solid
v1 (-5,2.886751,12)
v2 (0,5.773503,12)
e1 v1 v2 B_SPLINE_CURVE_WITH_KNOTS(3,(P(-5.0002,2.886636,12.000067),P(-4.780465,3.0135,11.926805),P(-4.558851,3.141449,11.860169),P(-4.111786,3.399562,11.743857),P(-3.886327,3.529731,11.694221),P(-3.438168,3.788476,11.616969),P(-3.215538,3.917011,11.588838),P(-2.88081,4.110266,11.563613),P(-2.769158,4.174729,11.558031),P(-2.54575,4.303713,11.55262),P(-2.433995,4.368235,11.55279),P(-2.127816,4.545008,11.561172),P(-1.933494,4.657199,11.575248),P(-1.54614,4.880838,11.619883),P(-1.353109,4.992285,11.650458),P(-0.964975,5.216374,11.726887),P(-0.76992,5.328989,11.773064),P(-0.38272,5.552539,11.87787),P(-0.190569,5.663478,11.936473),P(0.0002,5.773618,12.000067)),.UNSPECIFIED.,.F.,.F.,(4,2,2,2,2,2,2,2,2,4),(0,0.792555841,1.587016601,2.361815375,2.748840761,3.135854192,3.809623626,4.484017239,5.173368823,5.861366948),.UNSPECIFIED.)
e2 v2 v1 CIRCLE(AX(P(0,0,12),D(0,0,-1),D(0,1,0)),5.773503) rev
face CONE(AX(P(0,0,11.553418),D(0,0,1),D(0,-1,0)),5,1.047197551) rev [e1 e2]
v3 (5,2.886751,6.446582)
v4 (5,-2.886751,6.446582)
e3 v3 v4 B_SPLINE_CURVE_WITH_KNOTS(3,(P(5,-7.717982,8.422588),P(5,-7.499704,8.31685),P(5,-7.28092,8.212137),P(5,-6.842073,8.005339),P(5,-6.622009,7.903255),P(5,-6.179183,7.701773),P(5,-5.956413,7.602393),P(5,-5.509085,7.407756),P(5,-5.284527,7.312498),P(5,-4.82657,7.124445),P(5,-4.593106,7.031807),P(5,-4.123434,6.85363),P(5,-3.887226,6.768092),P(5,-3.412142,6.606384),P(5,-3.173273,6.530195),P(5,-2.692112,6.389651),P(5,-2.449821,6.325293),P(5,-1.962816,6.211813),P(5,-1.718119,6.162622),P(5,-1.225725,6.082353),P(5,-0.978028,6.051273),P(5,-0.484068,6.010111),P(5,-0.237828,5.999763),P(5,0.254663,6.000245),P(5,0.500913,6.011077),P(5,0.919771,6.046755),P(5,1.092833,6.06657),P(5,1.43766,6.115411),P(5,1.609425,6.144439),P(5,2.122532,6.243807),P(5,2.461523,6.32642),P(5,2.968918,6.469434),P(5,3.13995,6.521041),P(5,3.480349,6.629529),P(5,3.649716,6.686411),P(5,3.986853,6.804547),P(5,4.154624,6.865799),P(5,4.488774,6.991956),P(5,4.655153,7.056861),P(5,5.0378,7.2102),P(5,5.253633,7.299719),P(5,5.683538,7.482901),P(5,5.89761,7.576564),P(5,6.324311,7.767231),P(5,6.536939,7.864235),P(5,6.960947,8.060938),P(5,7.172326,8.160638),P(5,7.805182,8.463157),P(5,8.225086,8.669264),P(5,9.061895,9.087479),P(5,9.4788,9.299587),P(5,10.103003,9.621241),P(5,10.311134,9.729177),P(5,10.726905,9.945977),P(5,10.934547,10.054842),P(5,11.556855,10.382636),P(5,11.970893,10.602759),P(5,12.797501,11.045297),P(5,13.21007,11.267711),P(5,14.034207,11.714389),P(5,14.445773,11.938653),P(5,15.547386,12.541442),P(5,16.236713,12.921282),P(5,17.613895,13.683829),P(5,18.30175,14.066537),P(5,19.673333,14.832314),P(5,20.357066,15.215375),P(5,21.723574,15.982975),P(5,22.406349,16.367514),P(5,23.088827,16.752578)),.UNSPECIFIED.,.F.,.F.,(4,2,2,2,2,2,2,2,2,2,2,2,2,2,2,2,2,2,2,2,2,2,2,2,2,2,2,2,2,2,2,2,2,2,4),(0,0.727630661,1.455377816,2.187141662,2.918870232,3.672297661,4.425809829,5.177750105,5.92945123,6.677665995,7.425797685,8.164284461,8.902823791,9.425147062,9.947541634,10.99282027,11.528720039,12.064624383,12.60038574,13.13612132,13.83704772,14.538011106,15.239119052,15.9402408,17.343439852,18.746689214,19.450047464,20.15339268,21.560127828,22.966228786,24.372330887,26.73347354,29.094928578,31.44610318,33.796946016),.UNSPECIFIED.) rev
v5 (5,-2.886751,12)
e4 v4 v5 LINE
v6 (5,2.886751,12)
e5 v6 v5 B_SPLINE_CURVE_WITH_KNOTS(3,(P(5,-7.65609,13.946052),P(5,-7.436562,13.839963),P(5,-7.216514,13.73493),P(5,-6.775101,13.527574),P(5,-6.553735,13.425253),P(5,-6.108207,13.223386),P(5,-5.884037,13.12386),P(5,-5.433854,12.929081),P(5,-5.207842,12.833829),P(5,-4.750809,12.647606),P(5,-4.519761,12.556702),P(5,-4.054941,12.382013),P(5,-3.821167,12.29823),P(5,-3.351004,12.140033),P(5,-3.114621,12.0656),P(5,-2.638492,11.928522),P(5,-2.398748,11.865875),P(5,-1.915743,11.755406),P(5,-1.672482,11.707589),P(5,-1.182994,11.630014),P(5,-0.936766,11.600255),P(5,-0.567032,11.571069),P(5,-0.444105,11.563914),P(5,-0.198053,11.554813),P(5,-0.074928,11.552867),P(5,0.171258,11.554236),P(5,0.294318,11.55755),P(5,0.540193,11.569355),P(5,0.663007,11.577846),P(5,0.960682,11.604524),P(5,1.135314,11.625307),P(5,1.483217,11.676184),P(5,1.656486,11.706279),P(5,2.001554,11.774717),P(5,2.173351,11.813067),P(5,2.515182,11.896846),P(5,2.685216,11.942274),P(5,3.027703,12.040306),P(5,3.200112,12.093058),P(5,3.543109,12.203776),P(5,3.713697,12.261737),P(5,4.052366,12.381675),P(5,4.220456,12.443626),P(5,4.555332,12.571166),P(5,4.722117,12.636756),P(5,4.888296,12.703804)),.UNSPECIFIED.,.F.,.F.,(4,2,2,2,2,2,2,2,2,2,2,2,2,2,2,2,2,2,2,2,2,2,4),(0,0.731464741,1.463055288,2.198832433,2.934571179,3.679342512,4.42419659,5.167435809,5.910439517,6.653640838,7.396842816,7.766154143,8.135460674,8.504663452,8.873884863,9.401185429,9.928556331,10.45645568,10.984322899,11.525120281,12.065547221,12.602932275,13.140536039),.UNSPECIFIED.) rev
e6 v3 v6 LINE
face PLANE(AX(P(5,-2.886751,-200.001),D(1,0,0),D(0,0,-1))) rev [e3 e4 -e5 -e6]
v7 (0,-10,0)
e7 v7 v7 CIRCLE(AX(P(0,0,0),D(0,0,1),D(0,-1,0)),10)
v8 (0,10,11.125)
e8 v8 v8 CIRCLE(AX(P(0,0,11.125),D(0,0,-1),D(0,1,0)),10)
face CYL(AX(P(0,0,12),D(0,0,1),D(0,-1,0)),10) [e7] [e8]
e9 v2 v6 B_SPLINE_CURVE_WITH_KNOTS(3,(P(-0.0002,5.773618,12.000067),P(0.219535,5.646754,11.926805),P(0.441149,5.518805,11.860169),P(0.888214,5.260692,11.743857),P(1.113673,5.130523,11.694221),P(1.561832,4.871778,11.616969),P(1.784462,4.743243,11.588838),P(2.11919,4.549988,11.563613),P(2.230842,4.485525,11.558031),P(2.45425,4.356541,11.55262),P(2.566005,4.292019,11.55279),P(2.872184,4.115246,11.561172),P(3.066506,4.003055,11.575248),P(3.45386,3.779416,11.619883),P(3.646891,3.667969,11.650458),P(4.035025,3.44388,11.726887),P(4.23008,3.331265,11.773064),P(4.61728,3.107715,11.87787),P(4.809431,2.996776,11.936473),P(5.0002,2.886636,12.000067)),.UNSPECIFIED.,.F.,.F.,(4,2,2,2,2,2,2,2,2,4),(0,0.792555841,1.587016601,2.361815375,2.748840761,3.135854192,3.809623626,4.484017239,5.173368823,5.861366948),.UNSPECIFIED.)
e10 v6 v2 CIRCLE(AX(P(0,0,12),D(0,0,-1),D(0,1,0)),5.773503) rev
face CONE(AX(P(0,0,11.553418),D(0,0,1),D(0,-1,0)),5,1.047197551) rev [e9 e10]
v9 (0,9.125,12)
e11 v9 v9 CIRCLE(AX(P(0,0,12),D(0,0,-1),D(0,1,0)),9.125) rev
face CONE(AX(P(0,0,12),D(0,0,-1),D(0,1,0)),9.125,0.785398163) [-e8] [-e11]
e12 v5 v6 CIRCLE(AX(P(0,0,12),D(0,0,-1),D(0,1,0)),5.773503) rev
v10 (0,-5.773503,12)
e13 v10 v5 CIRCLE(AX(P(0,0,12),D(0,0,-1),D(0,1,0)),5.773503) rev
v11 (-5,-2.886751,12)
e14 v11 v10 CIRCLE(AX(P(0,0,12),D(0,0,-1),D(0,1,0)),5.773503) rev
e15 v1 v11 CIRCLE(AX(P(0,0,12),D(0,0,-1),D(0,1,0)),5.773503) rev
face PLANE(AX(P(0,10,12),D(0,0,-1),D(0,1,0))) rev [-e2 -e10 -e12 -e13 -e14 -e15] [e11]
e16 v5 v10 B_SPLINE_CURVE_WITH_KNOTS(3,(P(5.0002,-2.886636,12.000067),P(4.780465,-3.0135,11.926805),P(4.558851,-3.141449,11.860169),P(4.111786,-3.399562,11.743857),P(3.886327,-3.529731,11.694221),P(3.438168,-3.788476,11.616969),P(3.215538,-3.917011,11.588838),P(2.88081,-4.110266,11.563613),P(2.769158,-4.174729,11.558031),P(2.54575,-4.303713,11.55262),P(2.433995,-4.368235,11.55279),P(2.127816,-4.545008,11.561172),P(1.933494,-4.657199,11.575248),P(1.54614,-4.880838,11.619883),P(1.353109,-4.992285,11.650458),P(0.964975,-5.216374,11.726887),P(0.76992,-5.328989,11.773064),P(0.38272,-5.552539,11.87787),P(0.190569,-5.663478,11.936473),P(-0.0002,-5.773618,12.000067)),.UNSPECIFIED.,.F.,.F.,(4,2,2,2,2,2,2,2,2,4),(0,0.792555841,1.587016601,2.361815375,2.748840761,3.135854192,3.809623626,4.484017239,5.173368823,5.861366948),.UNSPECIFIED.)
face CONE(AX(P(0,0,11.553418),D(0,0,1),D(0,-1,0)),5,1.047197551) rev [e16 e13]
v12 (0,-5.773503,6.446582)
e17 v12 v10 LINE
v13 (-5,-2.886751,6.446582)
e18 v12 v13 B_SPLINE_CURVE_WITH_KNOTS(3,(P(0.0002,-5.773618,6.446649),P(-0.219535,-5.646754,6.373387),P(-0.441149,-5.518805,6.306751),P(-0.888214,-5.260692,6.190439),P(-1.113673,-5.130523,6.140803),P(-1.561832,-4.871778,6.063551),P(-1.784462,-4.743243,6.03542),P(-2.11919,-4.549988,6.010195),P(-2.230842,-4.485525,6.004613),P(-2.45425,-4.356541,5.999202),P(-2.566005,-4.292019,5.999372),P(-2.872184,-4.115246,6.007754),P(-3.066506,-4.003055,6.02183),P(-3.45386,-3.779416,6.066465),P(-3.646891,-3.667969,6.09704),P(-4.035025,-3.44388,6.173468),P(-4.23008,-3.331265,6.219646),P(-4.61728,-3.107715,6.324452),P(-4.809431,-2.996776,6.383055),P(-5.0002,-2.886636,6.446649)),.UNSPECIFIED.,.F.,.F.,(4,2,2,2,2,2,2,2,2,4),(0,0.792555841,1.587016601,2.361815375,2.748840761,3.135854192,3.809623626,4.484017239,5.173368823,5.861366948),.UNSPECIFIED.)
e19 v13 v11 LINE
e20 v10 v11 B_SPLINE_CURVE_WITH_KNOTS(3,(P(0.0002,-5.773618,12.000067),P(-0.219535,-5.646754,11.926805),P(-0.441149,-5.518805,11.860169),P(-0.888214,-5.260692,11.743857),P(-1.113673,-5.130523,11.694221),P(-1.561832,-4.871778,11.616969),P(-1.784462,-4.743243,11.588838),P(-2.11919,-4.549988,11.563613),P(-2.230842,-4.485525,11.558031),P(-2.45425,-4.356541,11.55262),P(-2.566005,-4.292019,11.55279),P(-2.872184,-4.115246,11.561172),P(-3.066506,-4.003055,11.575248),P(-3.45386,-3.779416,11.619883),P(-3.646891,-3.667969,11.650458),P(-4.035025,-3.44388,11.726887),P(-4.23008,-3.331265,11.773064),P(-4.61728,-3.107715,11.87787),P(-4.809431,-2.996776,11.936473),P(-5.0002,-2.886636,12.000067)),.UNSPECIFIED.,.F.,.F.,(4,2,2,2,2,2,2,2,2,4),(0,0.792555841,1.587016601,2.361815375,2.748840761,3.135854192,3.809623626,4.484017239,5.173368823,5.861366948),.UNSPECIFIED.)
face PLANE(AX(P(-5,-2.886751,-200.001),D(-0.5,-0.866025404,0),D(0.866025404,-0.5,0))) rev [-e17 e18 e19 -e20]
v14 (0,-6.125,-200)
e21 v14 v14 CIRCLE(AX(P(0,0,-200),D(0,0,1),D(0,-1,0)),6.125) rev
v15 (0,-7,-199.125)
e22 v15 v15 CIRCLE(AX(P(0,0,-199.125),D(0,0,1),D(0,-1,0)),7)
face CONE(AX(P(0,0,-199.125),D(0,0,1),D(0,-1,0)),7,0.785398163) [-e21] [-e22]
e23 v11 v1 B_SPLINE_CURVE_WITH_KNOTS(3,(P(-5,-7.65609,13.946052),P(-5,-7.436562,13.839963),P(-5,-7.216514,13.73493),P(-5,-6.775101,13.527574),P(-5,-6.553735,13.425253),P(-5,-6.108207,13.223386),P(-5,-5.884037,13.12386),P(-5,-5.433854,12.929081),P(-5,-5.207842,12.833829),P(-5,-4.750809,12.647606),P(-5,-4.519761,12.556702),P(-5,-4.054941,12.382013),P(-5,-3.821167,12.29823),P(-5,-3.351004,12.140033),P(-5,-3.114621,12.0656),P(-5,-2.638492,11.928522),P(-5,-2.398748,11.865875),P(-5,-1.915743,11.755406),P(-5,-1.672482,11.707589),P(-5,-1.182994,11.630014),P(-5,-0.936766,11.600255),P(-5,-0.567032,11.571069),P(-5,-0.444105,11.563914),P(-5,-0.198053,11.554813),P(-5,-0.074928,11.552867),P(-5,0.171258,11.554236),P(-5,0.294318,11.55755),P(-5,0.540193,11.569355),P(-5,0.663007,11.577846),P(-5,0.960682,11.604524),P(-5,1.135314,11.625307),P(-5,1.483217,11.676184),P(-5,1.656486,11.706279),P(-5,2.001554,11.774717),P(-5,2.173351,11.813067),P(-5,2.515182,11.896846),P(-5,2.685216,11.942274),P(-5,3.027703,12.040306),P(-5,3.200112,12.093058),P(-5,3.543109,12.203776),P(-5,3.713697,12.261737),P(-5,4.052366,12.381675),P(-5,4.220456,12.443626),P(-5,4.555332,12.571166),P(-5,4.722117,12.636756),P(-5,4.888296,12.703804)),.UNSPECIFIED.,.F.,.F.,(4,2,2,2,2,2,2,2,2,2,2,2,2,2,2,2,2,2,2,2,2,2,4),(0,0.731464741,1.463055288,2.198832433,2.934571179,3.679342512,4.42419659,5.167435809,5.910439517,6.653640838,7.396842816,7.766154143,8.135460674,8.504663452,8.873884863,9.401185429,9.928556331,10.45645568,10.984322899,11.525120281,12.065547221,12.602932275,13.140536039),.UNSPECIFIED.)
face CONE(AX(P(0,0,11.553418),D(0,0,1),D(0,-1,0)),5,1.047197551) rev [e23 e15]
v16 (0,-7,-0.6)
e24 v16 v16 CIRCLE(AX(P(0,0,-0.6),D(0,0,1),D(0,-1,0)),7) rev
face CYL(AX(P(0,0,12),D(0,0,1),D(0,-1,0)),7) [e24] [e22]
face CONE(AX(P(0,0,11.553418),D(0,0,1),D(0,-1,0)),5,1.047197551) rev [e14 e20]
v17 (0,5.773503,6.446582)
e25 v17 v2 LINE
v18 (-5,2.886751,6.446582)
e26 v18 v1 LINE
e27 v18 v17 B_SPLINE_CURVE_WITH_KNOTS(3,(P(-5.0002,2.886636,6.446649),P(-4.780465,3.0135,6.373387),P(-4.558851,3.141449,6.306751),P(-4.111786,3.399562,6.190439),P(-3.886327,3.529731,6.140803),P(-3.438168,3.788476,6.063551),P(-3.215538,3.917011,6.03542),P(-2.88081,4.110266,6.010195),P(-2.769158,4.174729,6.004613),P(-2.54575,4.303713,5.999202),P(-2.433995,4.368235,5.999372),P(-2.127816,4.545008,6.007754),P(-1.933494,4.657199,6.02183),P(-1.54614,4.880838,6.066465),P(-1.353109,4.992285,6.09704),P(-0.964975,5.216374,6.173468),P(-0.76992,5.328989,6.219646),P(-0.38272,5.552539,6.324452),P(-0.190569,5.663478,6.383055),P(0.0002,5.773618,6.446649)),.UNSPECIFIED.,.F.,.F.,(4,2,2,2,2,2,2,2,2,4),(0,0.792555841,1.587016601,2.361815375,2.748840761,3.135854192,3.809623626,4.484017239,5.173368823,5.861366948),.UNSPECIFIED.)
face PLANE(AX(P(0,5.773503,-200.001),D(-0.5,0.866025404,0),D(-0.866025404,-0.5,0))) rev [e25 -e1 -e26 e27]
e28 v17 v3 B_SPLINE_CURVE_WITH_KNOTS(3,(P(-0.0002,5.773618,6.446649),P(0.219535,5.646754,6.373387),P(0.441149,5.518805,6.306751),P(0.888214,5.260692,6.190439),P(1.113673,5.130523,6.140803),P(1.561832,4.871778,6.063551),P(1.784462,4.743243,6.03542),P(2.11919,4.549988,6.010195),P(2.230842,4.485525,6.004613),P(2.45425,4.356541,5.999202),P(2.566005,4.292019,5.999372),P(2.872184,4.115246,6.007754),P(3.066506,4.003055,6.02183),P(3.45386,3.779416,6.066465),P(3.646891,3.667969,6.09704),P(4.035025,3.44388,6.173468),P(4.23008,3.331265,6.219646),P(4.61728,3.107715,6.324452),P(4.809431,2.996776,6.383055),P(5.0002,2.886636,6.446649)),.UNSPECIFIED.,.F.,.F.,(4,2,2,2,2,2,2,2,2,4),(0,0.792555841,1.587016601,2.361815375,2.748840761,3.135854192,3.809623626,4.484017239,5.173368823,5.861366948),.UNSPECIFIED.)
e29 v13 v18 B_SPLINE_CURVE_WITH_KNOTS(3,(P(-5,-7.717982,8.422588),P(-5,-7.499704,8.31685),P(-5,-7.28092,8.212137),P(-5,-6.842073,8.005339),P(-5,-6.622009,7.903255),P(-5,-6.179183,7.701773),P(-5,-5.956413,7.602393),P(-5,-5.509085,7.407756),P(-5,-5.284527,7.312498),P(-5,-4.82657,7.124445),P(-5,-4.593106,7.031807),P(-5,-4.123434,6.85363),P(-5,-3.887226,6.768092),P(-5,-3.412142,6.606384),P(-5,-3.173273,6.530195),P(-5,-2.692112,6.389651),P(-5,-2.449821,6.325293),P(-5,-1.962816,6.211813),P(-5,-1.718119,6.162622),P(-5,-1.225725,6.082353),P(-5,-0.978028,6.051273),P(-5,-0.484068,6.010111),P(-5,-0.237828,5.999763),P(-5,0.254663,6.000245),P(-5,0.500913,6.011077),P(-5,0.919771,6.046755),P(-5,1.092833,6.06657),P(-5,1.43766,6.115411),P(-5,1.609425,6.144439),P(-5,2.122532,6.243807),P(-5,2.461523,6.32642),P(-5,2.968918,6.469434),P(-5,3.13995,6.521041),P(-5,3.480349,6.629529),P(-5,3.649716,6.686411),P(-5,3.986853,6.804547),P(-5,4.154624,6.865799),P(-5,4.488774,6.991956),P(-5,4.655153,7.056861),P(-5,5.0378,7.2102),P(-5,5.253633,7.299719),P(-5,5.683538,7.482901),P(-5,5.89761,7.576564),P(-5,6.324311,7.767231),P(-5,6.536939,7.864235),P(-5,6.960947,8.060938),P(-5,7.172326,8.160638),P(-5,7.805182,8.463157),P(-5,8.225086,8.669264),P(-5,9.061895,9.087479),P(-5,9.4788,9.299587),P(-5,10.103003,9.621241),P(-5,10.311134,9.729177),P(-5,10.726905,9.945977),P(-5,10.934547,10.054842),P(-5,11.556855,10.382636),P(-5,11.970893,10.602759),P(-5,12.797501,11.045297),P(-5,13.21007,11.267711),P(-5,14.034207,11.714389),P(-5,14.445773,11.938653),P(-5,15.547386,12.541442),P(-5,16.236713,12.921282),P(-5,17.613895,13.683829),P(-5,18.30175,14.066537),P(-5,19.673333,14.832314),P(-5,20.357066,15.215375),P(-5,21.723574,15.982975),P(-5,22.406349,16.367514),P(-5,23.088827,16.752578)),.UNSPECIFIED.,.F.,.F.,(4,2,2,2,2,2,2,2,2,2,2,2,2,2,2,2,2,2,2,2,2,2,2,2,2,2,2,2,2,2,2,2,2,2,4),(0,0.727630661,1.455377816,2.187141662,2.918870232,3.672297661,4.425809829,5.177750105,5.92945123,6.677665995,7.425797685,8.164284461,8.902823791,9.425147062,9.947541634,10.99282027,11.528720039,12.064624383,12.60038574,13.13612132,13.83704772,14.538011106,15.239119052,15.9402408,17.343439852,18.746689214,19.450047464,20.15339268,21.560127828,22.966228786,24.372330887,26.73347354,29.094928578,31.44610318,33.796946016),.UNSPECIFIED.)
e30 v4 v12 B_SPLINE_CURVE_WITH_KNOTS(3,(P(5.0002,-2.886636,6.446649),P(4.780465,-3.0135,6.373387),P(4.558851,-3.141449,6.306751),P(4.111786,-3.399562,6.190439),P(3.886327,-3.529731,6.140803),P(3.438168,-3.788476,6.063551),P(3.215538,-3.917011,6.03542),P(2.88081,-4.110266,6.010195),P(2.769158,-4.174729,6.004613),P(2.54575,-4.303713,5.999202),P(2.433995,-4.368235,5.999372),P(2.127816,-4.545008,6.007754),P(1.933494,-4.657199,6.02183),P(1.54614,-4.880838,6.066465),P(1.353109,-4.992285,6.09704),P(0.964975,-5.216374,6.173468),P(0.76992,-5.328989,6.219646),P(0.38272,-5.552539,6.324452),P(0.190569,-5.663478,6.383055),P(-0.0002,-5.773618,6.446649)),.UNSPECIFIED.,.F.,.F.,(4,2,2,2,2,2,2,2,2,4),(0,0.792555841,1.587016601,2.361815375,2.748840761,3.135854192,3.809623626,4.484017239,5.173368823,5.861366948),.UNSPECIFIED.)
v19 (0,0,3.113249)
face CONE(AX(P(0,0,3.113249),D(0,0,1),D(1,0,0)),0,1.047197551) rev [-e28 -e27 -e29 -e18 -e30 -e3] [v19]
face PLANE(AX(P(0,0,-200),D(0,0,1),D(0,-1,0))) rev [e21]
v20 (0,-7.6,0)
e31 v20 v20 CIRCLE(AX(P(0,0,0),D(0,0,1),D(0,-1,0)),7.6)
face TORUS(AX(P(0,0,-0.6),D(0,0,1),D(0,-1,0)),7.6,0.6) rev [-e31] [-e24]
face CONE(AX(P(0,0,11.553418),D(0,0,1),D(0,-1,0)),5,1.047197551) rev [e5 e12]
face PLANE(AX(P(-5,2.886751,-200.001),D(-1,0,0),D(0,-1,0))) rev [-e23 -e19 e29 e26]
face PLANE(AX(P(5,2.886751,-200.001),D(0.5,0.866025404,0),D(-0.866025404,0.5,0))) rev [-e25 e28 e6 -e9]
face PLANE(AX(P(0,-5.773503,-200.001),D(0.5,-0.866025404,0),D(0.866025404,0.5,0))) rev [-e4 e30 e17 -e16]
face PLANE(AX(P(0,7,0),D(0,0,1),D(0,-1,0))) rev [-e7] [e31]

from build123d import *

# Parameters (mm, degrees)
CHAMFER1_SIZE      = 0.875
CUT_EXTRUDE1_REACH = 214.471
FILLET2_R          = 0.6


with BuildPart() as part:
    # Sketch1 → Revolve1 (revolve)
    with BuildSketch(Plane(origin=(0, 0, 0), x_dir=(0, 0, -1), z_dir=(1, 0, 0))):
        Polygon((0, 10), (-12, 10), (-12, 0), (200, 0), (200, 7), (0, 7), align=None)
    revolve(axis=Axis((0, 0, 12), (0, 0, -1)))

    # Sketch7 → Cut-Revolve2 (revolve, cut)
    with BuildSketch(Plane(origin=(0, 0, 0), x_dir=(0, 0, -1), z_dir=(1, 0, 0))):
        Polygon((-12, 0), (-12, 5), (-6, 5), (-3.113248654, 0), align=None)
    revolve(axis=Axis((0, 0, 12), (0, 0, -1)), mode=Mode.SUBTRACT)

    # Chamfer1
    chamfer1_edges = [part.edges().sort_by_distance(p)[0] for p in [
        (0, -7, -200),
        (0, -10, 12),
    ]]
    chamfer(chamfer1_edges, length=CHAMFER1_SIZE)

    # Cut-Extrude1: up to this cone (the profile starts inside it)
    cut_extrude1_end = Plane(origin=(0, 0, 12), z_dir=(0, 0, 1)).offset(-8.886750346) * Cone(1.732e-06, 414.393253037, 239.250055191, align=(Align.CENTER, Align.CENTER, Align.MIN), mode=Mode.PRIVATE)
    # Sketch8 → Cut-Extrude1 (cut, up to the surface)
    with BuildSketch(Plane.XY.offset(12), mode=Mode.PRIVATE) as cut_extrude1_sk1:
        Polygon((0, 5.773502692), (-5, 2.886751346), (-5, -2.886751346), (0, -5.773502692), (5, -2.886751346), (5, 2.886751346), align=None)
    cut_extrude1_tool1 = extrude(cut_extrude1_sk1.sketch, amount=-CUT_EXTRUDE1_REACH, mode=Mode.PRIVATE) & cut_extrude1_end
    add(cut_extrude1_tool1.solids().sort_by_distance((0, 0, 12))[0], mode=Mode.SUBTRACT)

    # Sketch9 → Cut-Revolve3 (revolve, cut)
    with BuildSketch(Plane(origin=(0, 0, 0), x_dir=(0, 0, -1), z_dir=(1, 0, 0))):
        Polygon((-12.5, 6.639528096), (-12.5, 5), (-11.553418013, 5), align=None)
    revolve(axis=Axis((0, 0, 12), (0, 0, -1)), mode=Mode.SUBTRACT)

    # Fillet2
    fillet2_edges = [part.edges().sort_by_distance(p)[0] for p in [
        (0, -7, 0),
    ]]
    fillet(fillet2_edges, radius=FILLET2_R)


solid = part.part
